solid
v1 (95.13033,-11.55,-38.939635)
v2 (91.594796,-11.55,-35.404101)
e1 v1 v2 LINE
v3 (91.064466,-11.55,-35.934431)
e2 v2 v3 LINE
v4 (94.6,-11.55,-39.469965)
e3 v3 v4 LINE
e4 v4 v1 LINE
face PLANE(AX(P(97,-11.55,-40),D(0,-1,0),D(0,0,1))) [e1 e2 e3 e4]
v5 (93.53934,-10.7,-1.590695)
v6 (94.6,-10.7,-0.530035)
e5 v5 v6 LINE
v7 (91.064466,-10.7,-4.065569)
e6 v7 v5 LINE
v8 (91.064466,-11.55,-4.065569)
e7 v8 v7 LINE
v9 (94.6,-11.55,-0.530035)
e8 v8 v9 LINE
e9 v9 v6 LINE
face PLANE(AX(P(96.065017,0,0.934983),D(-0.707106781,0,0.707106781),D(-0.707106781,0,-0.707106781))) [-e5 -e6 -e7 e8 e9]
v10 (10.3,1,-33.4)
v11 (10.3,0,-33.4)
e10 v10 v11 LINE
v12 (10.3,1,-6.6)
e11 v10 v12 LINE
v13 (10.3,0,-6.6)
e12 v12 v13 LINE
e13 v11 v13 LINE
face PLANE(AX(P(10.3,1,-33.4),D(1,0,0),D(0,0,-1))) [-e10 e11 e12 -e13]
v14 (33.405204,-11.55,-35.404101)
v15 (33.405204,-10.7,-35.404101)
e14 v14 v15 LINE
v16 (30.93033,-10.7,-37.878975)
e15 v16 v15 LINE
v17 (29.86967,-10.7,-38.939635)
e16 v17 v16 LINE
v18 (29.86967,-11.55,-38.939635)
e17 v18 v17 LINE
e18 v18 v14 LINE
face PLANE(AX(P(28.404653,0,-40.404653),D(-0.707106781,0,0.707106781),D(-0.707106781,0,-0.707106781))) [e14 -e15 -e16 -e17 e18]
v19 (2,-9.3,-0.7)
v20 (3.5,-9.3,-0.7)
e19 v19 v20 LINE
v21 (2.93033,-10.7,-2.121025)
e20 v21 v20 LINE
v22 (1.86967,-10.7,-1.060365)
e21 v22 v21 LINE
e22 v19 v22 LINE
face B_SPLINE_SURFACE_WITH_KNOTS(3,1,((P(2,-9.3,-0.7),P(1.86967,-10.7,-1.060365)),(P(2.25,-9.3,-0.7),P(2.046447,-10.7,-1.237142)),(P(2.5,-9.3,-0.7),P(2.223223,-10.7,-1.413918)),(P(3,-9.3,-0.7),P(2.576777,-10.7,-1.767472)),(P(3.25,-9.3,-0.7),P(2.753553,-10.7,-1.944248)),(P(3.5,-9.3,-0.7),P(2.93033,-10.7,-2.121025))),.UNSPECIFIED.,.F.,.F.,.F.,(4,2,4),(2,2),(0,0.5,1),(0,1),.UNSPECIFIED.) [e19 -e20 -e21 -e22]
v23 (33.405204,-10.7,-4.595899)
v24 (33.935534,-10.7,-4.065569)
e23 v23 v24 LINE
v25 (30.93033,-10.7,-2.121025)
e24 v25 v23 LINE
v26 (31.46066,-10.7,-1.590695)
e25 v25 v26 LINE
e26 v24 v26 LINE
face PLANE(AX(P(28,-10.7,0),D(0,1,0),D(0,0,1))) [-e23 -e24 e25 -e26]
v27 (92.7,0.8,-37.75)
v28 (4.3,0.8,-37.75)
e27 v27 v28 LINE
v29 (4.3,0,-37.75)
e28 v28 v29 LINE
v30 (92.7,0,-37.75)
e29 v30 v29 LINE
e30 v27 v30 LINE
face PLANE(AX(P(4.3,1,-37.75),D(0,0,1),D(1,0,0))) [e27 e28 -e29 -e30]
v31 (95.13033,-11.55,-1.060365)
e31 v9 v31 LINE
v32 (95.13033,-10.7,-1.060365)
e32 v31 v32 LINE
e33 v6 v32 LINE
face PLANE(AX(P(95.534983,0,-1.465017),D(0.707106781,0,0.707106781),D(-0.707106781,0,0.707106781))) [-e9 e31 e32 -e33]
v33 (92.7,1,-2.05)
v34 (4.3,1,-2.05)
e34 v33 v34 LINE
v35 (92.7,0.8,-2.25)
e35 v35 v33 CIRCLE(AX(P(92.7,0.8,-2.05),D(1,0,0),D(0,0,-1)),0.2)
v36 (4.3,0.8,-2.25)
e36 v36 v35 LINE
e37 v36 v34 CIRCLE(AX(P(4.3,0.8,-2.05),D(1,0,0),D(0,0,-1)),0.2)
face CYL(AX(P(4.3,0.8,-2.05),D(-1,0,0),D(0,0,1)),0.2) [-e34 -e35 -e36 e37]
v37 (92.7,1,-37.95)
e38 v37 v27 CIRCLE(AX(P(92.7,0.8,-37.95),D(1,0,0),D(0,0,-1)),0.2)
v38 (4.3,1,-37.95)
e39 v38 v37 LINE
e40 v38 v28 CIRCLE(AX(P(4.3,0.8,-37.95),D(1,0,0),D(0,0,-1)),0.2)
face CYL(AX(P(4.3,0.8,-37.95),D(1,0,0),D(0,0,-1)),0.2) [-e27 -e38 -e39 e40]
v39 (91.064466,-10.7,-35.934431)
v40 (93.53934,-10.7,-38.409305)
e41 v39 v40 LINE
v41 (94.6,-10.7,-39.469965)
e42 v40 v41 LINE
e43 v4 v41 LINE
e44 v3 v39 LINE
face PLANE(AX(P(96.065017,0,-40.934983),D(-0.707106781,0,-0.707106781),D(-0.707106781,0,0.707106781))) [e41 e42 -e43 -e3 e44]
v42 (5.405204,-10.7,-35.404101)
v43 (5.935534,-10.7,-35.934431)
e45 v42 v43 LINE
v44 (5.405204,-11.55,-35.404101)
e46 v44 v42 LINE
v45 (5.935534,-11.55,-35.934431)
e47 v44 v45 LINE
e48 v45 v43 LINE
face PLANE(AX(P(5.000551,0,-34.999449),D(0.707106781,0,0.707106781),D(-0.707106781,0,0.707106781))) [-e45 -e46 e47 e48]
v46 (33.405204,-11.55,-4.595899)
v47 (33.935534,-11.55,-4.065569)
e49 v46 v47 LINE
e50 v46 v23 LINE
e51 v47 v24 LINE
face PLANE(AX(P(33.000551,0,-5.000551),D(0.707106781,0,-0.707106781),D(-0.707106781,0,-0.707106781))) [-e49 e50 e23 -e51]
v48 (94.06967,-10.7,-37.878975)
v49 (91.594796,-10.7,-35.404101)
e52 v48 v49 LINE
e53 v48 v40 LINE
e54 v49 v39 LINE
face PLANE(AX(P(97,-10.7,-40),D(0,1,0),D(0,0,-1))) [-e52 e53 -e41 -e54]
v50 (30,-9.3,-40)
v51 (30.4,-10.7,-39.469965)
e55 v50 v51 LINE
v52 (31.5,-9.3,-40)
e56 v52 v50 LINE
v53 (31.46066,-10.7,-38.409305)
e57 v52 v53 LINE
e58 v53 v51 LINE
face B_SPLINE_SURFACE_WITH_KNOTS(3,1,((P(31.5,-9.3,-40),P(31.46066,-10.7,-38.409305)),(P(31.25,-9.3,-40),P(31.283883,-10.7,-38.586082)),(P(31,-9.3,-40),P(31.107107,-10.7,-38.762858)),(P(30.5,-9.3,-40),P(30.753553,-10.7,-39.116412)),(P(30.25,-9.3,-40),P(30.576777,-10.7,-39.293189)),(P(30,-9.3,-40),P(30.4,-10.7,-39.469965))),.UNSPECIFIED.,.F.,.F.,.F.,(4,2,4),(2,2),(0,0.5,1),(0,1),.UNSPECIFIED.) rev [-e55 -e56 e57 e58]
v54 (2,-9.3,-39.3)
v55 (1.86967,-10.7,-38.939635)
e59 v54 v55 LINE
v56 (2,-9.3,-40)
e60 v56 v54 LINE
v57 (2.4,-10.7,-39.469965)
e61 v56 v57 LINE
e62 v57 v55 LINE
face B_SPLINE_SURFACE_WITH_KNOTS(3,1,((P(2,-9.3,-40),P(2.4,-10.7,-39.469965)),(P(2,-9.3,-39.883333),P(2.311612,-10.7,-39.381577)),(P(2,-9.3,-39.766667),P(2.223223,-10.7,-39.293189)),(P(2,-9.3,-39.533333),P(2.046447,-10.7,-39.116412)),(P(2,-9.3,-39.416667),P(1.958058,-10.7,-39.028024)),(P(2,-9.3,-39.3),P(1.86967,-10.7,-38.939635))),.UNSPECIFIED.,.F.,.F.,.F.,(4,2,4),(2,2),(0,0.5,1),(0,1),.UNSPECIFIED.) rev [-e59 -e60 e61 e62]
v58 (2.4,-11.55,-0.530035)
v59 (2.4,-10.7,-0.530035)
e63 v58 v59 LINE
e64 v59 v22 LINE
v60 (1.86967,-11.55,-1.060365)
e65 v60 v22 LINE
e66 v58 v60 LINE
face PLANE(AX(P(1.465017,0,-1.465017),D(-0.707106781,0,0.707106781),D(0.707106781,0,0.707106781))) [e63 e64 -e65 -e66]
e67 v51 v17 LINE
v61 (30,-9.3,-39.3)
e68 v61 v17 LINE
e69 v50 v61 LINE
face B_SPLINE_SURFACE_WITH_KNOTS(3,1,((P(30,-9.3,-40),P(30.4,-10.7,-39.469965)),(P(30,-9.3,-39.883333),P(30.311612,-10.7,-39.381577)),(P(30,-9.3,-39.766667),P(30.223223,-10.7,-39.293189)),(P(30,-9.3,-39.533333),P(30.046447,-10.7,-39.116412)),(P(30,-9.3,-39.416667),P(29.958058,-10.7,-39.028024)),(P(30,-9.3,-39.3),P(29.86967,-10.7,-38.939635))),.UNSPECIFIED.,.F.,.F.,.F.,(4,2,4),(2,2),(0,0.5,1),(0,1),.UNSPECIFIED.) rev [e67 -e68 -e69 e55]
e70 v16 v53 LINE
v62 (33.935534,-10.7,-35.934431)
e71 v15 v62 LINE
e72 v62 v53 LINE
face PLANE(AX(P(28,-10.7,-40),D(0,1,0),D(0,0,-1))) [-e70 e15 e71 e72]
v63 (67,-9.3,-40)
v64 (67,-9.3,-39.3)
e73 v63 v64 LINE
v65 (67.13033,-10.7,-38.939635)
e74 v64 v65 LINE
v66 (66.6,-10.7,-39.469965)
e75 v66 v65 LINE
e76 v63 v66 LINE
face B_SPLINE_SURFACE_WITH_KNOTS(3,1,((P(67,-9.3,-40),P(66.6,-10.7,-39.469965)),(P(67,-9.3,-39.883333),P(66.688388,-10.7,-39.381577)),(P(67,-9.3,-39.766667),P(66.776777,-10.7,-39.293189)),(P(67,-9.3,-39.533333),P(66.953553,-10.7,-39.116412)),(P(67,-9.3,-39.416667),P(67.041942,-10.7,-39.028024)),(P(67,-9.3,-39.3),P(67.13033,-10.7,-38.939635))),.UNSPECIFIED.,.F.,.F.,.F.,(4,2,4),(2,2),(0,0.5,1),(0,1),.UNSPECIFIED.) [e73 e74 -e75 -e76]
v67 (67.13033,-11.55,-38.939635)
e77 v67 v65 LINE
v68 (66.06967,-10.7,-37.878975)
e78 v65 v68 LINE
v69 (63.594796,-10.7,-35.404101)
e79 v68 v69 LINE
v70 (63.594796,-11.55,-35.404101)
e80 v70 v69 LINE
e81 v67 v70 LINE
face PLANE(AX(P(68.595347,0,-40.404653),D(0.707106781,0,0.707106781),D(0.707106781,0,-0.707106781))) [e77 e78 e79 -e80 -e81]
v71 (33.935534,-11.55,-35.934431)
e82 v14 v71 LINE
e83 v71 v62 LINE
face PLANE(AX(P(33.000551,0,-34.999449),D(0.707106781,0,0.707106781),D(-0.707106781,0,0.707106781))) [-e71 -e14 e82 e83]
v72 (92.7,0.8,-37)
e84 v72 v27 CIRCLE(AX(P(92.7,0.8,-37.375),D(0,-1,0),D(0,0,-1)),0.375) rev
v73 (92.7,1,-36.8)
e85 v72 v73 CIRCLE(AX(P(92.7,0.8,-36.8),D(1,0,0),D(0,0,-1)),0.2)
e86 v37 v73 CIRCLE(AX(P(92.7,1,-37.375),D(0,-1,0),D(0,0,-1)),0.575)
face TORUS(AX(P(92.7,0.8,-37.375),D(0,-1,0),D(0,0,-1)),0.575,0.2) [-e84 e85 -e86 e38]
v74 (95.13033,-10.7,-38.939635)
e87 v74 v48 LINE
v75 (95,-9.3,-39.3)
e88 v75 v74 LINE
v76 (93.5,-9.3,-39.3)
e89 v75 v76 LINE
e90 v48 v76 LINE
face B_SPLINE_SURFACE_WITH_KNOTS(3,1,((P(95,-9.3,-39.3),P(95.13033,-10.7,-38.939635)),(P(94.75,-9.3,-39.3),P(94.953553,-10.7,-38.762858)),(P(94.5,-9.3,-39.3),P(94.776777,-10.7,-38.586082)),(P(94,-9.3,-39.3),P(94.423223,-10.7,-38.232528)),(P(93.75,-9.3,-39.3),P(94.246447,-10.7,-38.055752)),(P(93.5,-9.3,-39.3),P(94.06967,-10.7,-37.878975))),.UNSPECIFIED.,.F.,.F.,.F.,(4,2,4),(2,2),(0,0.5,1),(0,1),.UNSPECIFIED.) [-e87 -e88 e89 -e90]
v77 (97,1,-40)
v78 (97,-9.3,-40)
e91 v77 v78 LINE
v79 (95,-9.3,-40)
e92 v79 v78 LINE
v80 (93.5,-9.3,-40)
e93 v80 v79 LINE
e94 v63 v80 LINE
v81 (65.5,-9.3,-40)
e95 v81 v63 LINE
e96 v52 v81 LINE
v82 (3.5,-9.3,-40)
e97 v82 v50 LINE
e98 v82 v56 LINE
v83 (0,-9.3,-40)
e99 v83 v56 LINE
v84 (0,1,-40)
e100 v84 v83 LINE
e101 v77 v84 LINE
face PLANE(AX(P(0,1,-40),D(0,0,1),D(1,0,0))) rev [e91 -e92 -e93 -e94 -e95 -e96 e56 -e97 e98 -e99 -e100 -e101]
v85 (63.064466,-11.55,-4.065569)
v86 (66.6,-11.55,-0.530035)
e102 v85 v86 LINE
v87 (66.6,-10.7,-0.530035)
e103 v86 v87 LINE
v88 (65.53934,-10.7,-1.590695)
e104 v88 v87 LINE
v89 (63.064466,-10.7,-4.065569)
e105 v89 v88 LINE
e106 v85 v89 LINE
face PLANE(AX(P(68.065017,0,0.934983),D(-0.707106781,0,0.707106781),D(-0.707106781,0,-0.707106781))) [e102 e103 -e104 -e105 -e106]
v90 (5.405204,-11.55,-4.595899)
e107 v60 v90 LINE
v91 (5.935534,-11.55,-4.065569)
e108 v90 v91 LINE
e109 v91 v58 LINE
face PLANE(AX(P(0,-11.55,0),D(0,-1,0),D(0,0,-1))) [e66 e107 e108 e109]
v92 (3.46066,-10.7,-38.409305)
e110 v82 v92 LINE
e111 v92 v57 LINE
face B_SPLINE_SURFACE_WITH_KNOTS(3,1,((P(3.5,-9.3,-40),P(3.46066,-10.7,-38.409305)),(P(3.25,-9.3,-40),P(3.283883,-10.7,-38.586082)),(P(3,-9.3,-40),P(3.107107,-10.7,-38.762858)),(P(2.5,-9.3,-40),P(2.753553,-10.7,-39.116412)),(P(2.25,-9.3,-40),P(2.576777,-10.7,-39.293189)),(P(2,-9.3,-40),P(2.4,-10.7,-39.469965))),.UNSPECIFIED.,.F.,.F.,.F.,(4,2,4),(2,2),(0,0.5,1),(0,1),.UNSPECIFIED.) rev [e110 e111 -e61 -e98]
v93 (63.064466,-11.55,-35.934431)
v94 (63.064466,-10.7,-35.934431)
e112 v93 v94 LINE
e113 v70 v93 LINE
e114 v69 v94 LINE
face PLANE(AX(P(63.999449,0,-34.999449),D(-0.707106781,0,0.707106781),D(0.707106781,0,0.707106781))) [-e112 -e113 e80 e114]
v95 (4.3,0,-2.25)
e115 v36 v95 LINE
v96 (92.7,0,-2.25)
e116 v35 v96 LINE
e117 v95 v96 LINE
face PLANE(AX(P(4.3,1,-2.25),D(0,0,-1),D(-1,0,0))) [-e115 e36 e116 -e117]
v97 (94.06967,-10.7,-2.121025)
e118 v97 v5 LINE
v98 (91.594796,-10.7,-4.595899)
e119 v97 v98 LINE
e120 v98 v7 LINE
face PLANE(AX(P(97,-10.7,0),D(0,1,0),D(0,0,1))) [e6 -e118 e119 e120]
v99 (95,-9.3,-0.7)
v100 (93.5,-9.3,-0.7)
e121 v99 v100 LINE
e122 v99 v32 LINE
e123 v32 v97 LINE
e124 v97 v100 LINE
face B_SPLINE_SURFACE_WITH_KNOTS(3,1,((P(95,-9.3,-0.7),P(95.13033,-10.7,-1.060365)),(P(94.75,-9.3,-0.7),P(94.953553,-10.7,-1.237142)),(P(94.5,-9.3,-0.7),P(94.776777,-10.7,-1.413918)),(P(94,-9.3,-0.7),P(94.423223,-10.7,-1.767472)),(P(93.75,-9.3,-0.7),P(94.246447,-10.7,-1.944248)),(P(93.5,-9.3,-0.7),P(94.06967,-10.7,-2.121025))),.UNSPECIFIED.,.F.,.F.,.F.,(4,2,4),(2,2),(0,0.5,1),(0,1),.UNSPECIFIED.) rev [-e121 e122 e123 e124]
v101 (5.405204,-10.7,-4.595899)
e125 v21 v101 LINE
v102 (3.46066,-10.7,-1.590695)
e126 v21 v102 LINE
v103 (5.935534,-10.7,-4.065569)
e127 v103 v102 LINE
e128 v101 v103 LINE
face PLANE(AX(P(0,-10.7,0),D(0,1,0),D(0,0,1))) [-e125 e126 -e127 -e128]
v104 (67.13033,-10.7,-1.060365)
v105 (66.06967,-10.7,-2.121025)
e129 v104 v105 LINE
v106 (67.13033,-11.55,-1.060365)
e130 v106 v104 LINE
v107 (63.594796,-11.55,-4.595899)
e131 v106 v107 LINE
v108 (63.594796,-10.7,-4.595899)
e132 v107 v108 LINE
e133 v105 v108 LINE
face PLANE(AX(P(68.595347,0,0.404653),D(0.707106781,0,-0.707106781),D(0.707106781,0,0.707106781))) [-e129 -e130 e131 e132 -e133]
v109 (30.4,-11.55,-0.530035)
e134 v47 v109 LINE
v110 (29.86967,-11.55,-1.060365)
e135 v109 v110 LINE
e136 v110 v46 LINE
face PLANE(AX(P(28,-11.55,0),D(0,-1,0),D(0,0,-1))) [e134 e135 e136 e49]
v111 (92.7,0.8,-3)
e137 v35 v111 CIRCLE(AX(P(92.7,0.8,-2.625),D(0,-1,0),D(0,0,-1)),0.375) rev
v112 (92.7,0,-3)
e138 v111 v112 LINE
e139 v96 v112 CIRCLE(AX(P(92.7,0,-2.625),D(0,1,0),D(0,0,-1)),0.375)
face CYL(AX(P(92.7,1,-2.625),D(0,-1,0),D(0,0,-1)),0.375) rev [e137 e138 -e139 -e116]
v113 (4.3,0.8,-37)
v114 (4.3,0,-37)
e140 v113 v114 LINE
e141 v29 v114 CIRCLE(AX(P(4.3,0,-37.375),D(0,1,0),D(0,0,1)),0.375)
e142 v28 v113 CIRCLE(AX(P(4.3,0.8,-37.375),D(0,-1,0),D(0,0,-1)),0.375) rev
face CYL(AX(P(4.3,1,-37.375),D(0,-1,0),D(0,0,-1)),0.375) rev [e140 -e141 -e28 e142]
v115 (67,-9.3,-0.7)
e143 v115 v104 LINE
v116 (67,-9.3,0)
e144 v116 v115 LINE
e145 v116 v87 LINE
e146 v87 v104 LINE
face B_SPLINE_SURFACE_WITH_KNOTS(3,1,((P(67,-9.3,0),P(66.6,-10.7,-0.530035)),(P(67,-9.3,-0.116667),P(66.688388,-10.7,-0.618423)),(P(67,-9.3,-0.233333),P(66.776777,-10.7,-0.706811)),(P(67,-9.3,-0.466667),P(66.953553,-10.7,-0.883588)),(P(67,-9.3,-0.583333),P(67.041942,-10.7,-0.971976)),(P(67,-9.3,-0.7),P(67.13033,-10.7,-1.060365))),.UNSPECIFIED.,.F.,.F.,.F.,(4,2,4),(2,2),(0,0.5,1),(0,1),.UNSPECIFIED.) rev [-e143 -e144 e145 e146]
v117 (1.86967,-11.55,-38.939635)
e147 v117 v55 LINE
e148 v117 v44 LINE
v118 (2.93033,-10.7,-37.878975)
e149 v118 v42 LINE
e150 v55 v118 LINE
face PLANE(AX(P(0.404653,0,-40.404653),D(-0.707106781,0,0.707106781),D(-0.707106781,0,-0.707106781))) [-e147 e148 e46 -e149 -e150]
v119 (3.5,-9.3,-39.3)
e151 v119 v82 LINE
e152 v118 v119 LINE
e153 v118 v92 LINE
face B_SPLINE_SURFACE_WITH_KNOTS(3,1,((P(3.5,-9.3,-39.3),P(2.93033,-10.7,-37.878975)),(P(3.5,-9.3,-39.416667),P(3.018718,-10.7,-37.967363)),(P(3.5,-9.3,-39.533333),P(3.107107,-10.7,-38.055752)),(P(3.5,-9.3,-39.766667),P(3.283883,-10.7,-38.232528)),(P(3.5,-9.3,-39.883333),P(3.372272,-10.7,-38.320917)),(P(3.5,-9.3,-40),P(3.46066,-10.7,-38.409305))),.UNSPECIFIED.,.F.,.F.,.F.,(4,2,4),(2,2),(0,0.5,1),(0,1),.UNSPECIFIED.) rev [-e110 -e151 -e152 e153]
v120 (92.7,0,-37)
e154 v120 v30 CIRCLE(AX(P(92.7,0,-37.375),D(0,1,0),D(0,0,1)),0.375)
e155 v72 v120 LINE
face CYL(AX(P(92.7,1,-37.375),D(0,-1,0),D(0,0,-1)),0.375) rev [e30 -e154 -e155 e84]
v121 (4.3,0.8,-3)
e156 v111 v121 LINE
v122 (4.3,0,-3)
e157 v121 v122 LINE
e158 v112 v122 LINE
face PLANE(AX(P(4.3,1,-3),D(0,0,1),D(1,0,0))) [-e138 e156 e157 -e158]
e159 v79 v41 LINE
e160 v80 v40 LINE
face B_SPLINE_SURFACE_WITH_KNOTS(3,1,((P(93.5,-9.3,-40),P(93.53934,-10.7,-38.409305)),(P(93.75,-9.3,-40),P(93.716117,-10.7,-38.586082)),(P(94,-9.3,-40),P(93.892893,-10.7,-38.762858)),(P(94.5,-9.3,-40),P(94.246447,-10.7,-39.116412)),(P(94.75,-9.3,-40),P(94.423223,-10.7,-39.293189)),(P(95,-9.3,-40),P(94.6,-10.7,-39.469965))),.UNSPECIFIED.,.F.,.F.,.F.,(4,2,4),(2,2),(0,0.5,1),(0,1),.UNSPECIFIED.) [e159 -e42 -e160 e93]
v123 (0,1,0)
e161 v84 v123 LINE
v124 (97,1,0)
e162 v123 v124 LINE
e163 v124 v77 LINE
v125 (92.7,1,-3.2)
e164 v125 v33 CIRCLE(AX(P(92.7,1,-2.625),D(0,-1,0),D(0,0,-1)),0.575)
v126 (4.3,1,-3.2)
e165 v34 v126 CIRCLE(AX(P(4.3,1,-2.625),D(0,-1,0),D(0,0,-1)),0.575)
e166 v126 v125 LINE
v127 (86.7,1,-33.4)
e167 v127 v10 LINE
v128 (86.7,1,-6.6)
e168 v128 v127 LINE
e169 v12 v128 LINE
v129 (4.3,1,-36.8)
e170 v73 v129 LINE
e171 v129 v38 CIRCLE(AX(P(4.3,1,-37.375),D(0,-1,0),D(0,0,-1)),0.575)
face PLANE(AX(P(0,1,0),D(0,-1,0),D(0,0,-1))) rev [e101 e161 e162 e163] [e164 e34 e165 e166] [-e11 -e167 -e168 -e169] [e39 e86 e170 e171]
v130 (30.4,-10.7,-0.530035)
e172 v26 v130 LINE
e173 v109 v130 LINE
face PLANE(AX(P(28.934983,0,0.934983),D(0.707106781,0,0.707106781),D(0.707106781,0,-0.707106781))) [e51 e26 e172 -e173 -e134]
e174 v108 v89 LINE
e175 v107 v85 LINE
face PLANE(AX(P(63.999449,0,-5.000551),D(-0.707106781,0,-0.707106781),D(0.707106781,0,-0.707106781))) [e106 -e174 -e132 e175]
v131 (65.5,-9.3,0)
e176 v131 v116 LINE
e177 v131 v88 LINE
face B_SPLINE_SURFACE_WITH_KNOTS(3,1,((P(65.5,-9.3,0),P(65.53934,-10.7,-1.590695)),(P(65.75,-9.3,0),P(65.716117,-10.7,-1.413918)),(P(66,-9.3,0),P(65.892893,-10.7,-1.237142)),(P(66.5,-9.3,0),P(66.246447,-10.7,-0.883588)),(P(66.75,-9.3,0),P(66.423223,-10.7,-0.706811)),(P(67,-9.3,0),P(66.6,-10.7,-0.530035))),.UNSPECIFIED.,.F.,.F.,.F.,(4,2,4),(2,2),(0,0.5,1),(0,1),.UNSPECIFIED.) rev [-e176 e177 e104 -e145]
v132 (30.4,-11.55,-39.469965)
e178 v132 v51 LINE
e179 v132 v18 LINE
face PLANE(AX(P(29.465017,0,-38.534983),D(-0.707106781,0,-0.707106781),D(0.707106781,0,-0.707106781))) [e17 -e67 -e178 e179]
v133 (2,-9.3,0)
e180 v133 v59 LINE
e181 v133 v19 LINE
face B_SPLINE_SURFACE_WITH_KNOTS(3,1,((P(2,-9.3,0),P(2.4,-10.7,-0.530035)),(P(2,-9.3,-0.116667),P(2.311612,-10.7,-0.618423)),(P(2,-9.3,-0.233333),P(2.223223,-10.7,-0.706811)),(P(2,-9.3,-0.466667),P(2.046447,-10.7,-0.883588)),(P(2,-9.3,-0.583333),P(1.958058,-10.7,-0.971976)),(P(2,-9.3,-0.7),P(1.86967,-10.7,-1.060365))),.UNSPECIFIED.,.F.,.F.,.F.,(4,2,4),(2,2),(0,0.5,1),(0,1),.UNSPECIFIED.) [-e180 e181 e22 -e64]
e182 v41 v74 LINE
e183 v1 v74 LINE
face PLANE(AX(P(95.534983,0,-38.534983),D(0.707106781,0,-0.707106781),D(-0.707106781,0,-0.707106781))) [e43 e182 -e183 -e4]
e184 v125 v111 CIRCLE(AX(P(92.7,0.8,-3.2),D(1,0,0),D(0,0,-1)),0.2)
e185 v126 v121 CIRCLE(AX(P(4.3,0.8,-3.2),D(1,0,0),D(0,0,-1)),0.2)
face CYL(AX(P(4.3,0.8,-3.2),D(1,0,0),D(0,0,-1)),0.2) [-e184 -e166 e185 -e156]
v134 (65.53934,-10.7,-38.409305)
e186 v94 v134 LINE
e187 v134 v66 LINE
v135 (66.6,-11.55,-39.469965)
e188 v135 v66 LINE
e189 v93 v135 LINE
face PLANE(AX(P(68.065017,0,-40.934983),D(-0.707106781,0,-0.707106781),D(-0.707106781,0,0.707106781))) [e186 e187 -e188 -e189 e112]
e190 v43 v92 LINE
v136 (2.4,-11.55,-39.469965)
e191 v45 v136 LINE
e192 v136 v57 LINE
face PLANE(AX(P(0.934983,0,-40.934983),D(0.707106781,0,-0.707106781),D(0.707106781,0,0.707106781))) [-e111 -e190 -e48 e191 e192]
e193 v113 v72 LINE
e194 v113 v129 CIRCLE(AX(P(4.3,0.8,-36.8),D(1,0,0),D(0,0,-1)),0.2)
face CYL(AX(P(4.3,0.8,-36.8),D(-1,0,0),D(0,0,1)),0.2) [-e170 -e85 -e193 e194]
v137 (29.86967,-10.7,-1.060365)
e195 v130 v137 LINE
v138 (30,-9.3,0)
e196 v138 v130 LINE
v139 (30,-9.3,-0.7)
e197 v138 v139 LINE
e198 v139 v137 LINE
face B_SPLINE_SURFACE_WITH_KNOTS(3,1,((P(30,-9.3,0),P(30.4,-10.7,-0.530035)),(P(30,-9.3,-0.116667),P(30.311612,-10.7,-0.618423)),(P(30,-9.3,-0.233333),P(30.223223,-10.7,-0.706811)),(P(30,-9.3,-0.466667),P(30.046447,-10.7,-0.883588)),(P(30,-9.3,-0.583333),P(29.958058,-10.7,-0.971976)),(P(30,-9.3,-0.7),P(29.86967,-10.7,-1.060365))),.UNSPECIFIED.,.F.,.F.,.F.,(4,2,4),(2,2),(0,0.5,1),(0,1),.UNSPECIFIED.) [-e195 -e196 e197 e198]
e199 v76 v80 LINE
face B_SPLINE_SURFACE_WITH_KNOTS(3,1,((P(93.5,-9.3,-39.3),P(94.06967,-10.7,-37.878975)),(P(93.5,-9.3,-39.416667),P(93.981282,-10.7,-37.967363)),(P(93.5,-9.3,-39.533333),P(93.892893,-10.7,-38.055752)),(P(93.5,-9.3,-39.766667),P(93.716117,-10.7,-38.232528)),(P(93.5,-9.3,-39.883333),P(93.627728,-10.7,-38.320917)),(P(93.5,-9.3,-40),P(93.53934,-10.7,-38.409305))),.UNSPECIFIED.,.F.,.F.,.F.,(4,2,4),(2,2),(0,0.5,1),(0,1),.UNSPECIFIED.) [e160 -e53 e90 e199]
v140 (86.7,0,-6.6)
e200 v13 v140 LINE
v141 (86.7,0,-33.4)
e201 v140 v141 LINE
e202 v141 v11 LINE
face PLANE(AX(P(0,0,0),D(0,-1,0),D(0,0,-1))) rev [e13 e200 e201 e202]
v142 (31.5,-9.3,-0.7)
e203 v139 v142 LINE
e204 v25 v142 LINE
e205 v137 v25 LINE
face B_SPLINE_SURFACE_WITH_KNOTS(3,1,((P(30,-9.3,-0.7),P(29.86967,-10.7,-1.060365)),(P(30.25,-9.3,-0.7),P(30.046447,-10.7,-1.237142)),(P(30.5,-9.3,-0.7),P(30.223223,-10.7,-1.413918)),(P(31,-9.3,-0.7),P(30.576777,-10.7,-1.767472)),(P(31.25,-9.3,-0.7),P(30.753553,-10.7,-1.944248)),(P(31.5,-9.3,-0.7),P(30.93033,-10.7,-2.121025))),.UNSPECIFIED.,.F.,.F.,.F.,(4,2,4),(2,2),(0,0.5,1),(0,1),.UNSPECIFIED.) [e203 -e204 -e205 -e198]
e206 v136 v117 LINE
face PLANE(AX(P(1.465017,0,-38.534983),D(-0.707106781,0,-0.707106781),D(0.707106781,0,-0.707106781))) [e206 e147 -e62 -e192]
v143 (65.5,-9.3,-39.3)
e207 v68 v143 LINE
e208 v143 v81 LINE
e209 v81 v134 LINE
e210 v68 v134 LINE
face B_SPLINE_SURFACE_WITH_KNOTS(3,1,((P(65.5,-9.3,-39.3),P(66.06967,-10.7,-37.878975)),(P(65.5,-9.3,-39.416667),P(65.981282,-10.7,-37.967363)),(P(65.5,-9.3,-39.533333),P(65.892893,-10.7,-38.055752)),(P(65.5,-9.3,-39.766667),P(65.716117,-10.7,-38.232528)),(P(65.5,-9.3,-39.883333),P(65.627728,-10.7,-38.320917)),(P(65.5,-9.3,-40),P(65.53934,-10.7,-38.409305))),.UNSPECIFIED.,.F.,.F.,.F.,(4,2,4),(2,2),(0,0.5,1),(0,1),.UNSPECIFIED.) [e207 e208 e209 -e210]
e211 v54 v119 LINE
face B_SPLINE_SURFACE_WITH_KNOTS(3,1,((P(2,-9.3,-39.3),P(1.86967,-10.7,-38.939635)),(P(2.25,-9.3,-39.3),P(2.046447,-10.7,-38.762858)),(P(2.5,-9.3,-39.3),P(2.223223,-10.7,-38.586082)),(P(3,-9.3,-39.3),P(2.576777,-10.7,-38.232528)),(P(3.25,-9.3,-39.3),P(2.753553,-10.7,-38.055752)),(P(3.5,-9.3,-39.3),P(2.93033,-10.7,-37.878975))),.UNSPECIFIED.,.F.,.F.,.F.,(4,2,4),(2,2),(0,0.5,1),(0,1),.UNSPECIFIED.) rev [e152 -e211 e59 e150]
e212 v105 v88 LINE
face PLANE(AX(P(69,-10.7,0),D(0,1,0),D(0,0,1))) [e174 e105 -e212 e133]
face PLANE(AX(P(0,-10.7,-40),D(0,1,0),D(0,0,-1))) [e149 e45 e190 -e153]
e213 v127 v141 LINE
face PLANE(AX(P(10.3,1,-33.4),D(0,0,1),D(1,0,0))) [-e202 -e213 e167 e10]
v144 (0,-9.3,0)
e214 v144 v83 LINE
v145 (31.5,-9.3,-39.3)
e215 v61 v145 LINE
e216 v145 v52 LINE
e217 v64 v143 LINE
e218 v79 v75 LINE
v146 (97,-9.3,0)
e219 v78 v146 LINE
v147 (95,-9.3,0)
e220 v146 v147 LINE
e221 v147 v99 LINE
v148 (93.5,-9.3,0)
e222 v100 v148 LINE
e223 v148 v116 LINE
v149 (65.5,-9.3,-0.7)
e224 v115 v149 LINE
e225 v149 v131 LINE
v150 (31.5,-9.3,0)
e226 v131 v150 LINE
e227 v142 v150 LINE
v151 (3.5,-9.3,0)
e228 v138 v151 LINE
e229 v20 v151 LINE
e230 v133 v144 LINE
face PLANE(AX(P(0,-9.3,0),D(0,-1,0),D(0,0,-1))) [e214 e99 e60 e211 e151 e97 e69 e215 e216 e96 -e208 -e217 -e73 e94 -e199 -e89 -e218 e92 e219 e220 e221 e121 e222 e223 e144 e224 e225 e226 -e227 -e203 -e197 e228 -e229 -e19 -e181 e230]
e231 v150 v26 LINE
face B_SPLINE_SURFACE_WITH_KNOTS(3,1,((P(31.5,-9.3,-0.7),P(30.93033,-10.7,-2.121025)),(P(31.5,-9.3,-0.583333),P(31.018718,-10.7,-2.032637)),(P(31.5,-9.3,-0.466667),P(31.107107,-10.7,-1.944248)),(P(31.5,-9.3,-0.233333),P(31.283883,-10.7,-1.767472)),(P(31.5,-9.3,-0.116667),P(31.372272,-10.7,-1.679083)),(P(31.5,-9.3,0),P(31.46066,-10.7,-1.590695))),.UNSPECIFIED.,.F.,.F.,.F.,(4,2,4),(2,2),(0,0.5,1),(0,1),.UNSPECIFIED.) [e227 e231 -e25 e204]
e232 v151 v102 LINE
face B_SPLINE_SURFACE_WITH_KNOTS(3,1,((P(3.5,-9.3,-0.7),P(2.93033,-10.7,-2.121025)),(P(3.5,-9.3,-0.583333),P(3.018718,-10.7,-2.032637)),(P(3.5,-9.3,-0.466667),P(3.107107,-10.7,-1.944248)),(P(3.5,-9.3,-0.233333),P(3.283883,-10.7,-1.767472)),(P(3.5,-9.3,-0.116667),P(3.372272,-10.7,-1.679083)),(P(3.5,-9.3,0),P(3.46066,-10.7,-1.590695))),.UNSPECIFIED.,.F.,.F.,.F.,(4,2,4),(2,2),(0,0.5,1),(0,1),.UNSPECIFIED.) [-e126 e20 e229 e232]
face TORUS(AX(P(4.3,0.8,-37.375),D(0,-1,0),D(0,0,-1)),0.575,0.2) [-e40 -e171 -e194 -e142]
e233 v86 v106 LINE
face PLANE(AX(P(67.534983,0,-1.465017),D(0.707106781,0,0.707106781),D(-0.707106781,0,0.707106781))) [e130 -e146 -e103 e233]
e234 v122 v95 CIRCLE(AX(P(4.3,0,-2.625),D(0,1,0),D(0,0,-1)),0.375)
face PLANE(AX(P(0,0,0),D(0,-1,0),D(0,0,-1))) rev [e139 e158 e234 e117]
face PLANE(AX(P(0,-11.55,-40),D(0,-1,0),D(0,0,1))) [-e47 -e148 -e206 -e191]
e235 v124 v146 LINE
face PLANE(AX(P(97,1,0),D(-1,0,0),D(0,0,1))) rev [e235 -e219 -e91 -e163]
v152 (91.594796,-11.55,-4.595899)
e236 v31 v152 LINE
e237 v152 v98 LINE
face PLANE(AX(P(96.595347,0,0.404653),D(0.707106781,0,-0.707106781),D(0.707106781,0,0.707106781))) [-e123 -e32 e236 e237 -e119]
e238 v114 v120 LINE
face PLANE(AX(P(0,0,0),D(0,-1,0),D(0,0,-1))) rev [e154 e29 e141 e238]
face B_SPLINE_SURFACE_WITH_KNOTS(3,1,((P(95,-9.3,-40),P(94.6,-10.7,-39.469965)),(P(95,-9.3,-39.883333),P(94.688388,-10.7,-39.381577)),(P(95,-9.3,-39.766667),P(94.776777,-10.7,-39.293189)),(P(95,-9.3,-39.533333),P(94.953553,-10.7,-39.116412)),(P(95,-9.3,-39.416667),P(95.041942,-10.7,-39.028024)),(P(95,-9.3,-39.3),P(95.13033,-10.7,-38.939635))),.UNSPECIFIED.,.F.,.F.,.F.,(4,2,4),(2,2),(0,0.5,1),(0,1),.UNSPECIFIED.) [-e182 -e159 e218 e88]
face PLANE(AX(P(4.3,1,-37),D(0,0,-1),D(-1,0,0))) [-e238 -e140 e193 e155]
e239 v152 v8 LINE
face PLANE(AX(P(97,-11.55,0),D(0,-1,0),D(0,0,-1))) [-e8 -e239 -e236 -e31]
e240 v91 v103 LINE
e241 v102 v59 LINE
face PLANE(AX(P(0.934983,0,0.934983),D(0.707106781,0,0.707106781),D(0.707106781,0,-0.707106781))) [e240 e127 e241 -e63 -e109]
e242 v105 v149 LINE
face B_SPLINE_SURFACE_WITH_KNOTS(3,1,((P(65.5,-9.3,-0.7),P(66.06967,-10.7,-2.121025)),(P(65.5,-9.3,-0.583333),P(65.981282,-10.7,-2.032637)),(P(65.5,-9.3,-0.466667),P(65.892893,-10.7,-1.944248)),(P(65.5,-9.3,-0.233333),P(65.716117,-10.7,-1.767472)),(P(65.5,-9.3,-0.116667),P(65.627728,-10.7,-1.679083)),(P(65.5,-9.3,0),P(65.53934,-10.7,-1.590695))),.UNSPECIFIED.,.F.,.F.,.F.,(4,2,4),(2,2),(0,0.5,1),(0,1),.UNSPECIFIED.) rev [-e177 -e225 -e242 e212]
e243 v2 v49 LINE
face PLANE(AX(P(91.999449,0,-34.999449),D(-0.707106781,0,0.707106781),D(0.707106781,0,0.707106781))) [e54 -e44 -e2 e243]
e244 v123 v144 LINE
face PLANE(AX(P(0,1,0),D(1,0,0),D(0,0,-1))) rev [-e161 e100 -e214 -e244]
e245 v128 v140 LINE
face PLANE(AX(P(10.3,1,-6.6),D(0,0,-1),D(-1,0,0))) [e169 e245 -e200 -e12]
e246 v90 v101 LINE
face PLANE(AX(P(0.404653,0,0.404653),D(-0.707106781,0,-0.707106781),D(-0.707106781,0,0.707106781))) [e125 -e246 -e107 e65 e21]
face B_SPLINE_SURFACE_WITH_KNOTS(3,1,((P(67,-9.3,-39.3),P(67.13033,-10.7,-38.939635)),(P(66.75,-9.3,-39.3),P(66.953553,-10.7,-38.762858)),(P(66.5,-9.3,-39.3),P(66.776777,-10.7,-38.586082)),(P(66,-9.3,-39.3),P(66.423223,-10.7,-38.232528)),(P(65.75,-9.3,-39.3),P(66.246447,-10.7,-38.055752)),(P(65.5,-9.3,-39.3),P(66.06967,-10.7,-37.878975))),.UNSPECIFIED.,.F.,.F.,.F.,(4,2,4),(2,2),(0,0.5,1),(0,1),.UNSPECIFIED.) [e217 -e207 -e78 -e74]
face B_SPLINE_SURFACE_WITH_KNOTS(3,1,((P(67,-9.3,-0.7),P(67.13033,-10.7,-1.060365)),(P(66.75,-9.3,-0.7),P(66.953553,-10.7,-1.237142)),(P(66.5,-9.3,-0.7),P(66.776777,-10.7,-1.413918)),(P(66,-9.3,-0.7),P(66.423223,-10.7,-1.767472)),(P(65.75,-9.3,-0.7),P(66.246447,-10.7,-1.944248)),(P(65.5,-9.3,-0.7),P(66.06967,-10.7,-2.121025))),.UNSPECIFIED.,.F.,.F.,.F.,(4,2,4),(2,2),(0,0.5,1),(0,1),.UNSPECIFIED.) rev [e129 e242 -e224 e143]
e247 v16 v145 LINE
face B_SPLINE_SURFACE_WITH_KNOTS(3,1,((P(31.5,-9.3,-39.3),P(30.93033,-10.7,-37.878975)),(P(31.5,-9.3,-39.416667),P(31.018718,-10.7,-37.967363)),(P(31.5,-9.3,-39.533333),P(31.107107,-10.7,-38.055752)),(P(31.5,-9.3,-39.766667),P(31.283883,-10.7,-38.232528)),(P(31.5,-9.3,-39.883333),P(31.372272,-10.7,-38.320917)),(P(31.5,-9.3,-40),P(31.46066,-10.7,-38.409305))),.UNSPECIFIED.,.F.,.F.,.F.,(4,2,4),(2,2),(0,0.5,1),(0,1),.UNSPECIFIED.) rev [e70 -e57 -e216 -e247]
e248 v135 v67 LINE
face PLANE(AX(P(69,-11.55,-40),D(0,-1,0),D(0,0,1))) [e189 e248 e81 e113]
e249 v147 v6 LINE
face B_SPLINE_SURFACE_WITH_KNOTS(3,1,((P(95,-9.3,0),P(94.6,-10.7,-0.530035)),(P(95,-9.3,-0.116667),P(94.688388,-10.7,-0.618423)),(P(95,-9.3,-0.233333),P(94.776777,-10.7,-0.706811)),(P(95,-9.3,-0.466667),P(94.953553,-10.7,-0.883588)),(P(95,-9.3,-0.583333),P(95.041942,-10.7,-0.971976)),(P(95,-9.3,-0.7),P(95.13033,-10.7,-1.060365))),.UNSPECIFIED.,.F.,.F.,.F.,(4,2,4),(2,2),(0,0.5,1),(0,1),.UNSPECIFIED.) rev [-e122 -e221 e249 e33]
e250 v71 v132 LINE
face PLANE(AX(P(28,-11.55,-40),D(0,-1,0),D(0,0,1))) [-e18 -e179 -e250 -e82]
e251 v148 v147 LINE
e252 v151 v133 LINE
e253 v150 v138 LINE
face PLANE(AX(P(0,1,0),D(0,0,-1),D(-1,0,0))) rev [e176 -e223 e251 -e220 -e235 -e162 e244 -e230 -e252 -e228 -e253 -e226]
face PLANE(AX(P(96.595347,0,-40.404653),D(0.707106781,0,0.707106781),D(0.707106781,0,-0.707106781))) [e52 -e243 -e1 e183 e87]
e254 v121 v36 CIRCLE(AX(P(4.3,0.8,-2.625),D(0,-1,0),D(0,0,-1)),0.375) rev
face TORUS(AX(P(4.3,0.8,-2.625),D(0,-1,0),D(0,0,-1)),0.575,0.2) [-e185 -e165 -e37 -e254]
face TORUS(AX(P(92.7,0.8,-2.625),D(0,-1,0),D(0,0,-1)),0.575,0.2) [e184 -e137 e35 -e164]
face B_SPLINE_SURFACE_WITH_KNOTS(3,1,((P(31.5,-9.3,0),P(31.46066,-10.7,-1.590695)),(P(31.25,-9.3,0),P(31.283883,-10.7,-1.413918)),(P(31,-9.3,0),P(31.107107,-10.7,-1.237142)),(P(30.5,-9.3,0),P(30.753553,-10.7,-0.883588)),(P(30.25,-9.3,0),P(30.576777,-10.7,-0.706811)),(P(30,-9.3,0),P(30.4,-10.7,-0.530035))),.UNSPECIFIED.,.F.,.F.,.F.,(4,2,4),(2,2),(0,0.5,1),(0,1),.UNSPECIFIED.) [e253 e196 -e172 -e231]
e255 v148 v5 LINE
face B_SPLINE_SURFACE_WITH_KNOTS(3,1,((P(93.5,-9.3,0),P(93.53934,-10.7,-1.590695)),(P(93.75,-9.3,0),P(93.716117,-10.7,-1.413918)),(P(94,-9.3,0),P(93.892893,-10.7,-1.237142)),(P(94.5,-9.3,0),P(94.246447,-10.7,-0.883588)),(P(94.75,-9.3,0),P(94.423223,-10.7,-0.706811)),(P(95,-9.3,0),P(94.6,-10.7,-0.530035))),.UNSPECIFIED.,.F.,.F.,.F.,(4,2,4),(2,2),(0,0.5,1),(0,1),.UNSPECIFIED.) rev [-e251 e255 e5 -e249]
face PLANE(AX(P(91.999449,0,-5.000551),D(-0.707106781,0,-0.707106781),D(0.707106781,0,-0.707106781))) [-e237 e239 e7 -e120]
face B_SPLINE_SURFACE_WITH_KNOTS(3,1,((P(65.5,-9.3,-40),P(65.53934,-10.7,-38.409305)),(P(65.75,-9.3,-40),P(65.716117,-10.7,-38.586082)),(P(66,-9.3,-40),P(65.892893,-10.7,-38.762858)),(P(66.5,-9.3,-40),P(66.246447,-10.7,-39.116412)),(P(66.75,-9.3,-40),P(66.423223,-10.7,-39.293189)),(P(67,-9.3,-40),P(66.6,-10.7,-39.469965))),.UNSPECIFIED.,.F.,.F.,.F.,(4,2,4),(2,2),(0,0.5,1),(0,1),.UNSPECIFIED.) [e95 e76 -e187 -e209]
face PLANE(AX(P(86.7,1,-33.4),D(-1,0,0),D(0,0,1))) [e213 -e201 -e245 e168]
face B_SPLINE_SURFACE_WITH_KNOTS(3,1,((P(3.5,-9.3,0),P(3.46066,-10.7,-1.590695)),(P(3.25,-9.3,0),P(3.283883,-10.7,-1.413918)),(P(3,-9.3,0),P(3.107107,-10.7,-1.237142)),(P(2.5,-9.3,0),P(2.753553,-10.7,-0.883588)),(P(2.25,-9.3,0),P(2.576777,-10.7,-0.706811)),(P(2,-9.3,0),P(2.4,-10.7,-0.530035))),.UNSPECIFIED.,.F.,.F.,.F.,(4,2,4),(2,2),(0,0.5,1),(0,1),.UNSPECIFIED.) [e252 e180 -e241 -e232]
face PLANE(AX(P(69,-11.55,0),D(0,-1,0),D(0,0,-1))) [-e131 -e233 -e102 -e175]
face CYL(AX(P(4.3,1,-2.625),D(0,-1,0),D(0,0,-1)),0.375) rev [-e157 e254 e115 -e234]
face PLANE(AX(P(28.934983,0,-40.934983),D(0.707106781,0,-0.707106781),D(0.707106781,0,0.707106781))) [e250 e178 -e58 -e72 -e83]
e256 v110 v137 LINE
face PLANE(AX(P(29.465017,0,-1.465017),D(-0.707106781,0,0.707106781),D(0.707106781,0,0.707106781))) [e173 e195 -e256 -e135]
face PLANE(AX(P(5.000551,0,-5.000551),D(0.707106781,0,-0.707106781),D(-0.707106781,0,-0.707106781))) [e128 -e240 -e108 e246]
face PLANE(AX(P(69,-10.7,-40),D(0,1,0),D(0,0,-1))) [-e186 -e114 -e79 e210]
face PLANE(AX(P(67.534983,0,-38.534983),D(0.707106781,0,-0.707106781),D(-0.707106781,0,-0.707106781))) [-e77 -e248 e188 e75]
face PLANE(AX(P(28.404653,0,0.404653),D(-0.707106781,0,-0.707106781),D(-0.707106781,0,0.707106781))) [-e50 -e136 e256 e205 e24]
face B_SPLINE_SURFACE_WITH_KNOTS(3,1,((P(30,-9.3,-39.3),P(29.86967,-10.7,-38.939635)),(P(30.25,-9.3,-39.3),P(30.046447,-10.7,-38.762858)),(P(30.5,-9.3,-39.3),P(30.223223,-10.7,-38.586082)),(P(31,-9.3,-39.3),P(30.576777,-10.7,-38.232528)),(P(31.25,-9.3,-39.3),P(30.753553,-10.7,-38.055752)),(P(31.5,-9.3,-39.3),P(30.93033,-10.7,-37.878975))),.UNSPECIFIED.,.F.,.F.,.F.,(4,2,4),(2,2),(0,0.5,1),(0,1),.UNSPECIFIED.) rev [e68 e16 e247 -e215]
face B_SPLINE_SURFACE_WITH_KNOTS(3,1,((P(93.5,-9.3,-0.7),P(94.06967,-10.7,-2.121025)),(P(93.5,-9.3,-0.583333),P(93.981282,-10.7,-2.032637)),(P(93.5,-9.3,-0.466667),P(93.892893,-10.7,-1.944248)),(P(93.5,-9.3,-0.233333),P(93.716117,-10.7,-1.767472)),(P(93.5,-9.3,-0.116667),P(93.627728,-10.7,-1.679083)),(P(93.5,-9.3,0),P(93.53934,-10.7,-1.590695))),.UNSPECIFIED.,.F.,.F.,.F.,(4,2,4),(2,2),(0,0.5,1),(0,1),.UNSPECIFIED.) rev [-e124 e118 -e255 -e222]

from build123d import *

# Parameters (mm, degrees)
SKETCH1_W           = 97
SKETCH1_H           = 40
SKETCH1_W_2         = 76.4
SKETCH1_H_2         = 26.8
BOSS_EXTRUDE2_DEPTH = 1
FILLET1_R           = 0.2
SKETCH2_W           = 97
SKETCH2_H           = 40
BOSS_EXTRUDE3_DEPTH = 9.3
LPATTERN1_COUNT     = 2
LPATTERN1_PITCH     = 28


# Read off the part's stored shape, not the designer's step: Mirror1, Mirror2
with BuildPart() as part:
    # Sketch1 → Boss-Extrude2 (new body)
    with BuildSketch(Plane(origin=(0, 0, 0), x_dir=(1, 0, 0), z_dir=(0, 1, 0))):
        with Locations((48.5, 20)):
            Rectangle(SKETCH1_W, SKETCH1_H)
        with Locations((48.5, 20)):
            Rectangle(SKETCH1_W_2, SKETCH1_H_2, mode=Mode.SUBTRACT)
        with BuildLine():
            Line((4.3, 37.75), (92.7, 37.75))
            ThreePointArc((92.7, 37.75), (93.075, 37.375), (92.7, 37))
            Line((92.7, 37), (4.3, 37))
            ThreePointArc((4.3, 37), (3.925, 37.375), (4.3, 37.75))
        make_face(mode=Mode.SUBTRACT)
        with BuildLine():
            Line((4.3, 2.25), (92.7, 2.25))
            ThreePointArc((92.7, 2.25), (93.075, 2.625), (92.7, 3))
            Line((92.7, 3), (4.3, 3))
            ThreePointArc((4.3, 3), (3.925, 2.625), (4.3, 2.25))
        make_face(mode=Mode.SUBTRACT)
    extrude(amount=BOSS_EXTRUDE2_DEPTH)

    # Fillet1
    fillet1_edges = [part.edges().sort_by_distance(p)[0] for p in [
        (3.925, 1, -37.375),
        (48.5, 1, -37),
        (93.075, 1, -37.375),
        (48.5, 1, -37.75),
        (3.925, 1, -2.625),
        (48.5, 1, -2.25),
        (93.075, 1, -2.625),
        (48.5, 1, -3),
    ]]
    fillet(fillet1_edges, radius=FILLET1_R)

    # Sketch2 → Boss-Extrude3 (add)
    with BuildSketch(Plane.XZ):
        with Locations((48.5, -20)):
            Rectangle(SKETCH2_W, SKETCH2_H)
    extrude(amount=BOSS_EXTRUDE3_DEPTH)

    # Sketch3 → Loft1 section 0
    with BuildSketch(Plane.XZ.offset(9.3)):
        with BuildLine():
            Line((2, 0), (3.5, 0))
            Line((3.5, 0), (3.5, -0.7))
            Line((3.5, -0.7), (2, -0.7))
            Line((2, -0.7), (2, 0))
        make_face()
    # Sketch5 → Loft1 section 1
    with BuildSketch(Plane(origin=(0, -10.7, 0), x_dir=(-1, 0, 0), z_dir=(0, -1, 0))):
        with BuildLine():
            Line((-2.4, 0.530034721), (-3.460660172, 1.590694893))
            Line((-3.460660172, 1.590694893), (-2.930330086, 2.121024979))
            Line((-2.930330086, 2.121024979), (-1.869669914, 1.060364807))
            Line((-1.869669914, 1.060364807), (-2.4, 0.530034721))
        make_face()
    loft1 = loft()

    # Sketch4 → Loft2 section 0
    with BuildSketch(Plane(origin=(0, -11.55, 0), x_dir=(-1, 0, 0), z_dir=(0, -1, 0))):
        with BuildLine():
            Line((-2.4, 0.530034721), (-5.935533906, 4.065568627))
            Line((-5.935533906, 4.065568627), (-5.40520382, 4.595898713))
            Line((-5.40520382, 4.595898713), (-1.869669914, 1.060364807))
            Line((-1.869669914, 1.060364807), (-2.4, 0.530034721))
        make_face()
    # Sketch6 → Loft2 section 1
    with BuildSketch(Plane(origin=(0, -10.7, 0), x_dir=(-1, 0, 0), z_dir=(0, -1, 0))):
        with BuildLine():
            Line((-5.935533906, 4.065568627), (-5.40520382, 4.595898713))
            Line((-5.40520382, 4.595898713), (-1.869669914, 1.060364807))
            Line((-1.869669914, 1.060364807), (-2.4, 0.530034721))
            Line((-2.4, 0.530034721), (-5.935533906, 4.065568627))
        make_face()
    loft2 = loft()

    # LPattern1: Loft1, Loft2 ×2
    with Locations(*[(i * LPATTERN1_PITCH, 0, 0) for i in range(1, LPATTERN1_COUNT)]):
        add(loft1)
        add(loft2)

    # Mirror1: part across plane


with BuildPart() as part_1:
    add(part.part)
    add(part.part.mirror(Plane(origin=(48.5, 0, 0), x_dir=(0, 0, 1), z_dir=(1, 0, 0))))

    # Mirror2: part across plane


with BuildPart() as part_2:
    add(part_1.part)
    add(part_1.part.mirror(Plane.XY.offset(-20)))


solid = part_2.part
